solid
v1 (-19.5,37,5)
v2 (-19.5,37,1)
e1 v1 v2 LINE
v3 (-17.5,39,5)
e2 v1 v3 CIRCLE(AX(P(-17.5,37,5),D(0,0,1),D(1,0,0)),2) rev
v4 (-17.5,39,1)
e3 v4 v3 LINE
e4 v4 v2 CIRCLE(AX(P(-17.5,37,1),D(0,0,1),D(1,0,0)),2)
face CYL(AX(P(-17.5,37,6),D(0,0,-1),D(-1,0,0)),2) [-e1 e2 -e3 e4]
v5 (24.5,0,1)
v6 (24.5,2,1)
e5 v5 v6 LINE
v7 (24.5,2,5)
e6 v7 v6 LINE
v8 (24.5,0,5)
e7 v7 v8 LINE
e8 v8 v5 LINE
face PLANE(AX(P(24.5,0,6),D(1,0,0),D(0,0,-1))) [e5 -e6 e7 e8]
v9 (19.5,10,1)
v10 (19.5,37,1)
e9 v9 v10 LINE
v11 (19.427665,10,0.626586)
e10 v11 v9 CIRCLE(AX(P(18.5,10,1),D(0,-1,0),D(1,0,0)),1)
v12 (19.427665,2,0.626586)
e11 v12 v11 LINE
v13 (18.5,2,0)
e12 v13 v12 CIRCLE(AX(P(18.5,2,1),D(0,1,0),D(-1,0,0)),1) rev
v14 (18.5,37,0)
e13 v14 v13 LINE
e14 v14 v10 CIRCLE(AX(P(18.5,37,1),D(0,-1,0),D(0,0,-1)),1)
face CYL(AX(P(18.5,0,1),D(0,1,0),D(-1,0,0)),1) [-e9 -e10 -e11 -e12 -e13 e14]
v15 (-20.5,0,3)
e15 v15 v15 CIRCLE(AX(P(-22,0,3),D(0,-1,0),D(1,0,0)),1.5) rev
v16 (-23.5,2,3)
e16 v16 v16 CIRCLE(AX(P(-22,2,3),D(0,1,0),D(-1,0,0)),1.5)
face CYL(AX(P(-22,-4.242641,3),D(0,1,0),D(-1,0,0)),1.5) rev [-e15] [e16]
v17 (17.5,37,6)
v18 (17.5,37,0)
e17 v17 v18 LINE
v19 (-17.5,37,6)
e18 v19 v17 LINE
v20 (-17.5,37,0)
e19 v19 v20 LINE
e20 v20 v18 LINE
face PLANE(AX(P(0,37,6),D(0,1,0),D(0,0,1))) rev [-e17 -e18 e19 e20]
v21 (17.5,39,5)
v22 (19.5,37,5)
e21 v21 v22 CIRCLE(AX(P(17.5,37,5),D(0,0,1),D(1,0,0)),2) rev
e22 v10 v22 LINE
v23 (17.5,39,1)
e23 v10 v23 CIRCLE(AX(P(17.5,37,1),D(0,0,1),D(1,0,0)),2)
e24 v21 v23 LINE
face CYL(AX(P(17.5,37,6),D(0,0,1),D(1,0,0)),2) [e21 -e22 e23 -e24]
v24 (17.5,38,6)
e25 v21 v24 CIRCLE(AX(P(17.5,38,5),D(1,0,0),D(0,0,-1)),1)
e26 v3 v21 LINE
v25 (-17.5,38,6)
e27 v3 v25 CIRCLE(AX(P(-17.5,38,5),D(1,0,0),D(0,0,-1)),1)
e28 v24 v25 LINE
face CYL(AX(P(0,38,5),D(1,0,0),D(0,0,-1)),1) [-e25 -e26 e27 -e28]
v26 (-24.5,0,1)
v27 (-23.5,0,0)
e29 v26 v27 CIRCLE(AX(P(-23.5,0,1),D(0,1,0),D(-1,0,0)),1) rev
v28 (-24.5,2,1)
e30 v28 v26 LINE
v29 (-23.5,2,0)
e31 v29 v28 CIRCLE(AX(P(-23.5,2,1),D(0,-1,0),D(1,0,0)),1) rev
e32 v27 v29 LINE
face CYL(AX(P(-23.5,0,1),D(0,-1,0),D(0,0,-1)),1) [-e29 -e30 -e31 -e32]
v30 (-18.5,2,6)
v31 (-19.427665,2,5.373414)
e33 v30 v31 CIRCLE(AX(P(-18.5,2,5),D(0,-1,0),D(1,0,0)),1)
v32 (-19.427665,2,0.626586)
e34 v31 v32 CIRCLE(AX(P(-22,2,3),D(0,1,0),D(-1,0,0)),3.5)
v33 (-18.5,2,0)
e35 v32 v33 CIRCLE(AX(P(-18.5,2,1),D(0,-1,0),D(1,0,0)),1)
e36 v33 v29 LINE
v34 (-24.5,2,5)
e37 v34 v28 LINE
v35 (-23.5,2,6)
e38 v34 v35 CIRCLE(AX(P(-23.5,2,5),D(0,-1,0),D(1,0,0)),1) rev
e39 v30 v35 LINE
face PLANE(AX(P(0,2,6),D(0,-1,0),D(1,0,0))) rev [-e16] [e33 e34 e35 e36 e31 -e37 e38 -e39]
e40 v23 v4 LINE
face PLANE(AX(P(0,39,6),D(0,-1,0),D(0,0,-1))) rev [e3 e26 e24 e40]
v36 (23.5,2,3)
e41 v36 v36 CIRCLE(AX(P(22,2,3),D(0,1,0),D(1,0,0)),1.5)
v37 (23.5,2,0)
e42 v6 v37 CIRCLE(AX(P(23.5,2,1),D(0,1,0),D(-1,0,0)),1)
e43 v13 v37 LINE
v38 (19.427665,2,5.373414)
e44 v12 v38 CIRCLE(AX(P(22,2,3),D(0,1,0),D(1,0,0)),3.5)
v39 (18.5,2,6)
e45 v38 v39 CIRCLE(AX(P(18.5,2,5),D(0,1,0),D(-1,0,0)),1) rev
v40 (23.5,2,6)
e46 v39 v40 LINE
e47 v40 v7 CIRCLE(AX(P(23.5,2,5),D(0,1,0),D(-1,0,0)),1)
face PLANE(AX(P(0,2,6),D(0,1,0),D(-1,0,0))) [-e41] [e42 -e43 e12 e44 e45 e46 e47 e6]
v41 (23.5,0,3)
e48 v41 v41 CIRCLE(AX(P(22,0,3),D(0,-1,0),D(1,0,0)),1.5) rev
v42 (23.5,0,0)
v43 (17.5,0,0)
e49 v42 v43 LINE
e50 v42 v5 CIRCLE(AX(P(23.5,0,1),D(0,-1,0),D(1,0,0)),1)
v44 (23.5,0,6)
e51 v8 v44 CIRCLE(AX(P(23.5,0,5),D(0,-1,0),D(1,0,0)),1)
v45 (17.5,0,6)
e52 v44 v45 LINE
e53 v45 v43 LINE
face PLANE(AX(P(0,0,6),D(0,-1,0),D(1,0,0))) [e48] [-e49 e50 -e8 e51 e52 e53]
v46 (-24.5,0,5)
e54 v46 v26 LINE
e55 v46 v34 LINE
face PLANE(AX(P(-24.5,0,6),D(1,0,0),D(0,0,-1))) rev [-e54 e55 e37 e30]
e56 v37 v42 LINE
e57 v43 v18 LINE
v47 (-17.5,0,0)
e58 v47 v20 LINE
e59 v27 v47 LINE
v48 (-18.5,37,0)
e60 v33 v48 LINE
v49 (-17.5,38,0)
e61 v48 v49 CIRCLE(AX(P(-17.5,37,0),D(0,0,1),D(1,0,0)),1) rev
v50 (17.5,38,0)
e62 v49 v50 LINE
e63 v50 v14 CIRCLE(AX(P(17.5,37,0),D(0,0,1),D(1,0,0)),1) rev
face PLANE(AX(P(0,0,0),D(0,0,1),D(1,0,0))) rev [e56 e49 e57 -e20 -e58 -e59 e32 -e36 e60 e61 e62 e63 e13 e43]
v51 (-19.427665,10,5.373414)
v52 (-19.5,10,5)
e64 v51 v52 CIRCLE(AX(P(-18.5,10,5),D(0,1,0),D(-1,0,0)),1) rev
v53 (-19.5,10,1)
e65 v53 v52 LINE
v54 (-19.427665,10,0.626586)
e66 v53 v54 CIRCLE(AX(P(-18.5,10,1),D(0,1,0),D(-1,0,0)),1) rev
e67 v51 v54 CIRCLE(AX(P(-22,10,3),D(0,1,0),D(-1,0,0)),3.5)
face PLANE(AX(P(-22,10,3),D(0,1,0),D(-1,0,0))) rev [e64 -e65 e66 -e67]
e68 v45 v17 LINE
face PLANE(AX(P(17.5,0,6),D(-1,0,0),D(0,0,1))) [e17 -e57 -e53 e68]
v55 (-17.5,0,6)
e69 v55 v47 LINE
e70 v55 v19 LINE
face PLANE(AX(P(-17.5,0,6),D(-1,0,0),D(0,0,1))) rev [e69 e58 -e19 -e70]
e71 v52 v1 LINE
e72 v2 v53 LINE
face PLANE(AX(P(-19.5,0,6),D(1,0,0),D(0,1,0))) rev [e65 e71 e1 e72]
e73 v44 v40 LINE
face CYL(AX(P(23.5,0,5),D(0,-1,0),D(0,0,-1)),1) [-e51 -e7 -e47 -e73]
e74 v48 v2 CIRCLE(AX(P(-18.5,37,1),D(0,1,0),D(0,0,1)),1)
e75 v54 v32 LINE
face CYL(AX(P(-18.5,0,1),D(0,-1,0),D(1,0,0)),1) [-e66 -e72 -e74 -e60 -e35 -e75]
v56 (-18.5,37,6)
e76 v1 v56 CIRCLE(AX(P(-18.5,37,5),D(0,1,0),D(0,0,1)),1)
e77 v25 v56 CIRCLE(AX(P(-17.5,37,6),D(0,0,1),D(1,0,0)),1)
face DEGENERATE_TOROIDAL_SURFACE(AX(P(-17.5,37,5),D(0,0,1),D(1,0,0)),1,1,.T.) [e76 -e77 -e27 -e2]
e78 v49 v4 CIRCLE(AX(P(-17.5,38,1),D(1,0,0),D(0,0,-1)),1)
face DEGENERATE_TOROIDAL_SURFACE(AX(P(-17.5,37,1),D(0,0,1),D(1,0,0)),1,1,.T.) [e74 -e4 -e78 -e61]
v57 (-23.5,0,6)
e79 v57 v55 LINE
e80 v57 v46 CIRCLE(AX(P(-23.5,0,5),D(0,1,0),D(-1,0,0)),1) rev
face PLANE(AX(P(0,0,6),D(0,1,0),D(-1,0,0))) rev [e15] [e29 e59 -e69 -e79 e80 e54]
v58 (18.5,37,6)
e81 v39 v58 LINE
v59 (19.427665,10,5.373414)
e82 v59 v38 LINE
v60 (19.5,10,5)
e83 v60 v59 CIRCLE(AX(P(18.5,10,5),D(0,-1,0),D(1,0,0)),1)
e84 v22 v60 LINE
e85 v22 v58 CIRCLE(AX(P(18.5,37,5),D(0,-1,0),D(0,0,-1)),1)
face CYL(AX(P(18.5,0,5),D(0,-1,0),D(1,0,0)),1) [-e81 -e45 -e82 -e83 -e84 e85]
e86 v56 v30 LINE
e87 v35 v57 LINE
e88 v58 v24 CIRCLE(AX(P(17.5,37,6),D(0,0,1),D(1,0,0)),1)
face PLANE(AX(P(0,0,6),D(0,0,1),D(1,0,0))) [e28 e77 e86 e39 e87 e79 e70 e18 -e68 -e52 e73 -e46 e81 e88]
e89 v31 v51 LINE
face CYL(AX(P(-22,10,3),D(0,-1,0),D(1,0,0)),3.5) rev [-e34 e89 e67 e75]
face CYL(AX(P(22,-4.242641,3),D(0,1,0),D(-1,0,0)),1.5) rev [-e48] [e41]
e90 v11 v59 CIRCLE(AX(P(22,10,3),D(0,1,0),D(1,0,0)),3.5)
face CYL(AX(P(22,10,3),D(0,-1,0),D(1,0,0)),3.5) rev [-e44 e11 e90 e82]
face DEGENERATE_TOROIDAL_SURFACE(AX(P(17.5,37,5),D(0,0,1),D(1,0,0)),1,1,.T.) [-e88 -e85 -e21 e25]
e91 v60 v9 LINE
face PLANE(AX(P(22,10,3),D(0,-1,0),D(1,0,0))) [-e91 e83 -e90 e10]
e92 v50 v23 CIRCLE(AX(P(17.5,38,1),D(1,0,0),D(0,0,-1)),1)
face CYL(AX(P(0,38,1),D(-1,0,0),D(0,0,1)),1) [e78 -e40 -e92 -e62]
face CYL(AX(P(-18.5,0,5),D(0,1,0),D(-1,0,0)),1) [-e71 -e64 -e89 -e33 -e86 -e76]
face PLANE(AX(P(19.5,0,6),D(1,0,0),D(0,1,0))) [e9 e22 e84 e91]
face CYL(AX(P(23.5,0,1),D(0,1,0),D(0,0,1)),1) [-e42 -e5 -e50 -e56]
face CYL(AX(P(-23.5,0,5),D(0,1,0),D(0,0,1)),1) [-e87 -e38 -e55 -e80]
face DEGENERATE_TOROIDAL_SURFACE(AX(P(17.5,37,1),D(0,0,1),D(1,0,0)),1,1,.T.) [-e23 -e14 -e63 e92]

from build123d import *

# Parameters (mm, degrees)
BOSS_EXTRUDE1_DEPTH = 6
SKETCH2_R           = 1.5
CUT_EXTRUDE1_DEPTH  = 2
FILLET1_R           = 2
SKETCH3_R           = 3.5
CUT_EXTRUDE2_DEPTH  = 8
FILLET2_R           = 1


with BuildPart() as part:
    # Sketch1 → Boss-Extrude1 (new body)
    with BuildSketch(Plane.XY):
        Polygon((-24.5, 2), (-24.5, 0), (-17.5, 0), (-17.5, 37), (0, 37), (0, 39), (-19.5, 39), (-19.5, 2), align=None)
        Polygon((0, 39), (0, 37), (17.5, 37), (17.5, 0), (24.5, 0), (24.5, 2), (19.5, 2), (19.5, 39), align=None)
    extrude(amount=BOSS_EXTRUDE1_DEPTH)

    # Sketch2 → Cut-Extrude1 (cut)
    with BuildSketch(Plane(origin=(0, 2, 0), x_dir=(1, 0, 0), z_dir=(0, 1, 0))):
        with Locations(Location((-22, -3, 0), (0, 0, 180))):
            Circle(SKETCH2_R)
        with Locations((22, -3)):
            Circle(SKETCH2_R)
    extrude(amount=-CUT_EXTRUDE1_DEPTH, mode=Mode.SUBTRACT)

    # Fillet1
    fillet1_edges = [part.edges().sort_by_distance(p)[0] for p in [
        (-19.5, 39, 3),
        (19.5, 39, 3),
    ]]
    fillet(fillet1_edges, radius=FILLET1_R)

    # Sketch3 → Cut-Extrude2 (cut)
    with BuildSketch(Plane(origin=(0, 2, 0), x_dir=(1, 0, 0), z_dir=(0, 1, 0))):
        with Locations((-22, -3)):
            Circle(SKETCH3_R)
        with Locations((22, -3)):
            Circle(SKETCH3_R)
    extrude(amount=CUT_EXTRUDE2_DEPTH, mode=Mode.SUBTRACT)

    # Fillet2
    # the kernel refuses this fillet: 1 mm, written as the material it takes off along each edge
    with BuildSketch(Plane(origin=(19.5, 2, 0), x_dir=(0, 0, 1), z_dir=(0, 1, 0)), Plane(origin=(19.5, 2, 6), x_dir=(-1, 0, 0), z_dir=(0, 1, 0)), Plane(origin=(17.5, 39, 0), x_dir=(0, 0, 1), z_dir=(-1, 0, 0)), Plane(origin=(-17.5, 39, 6), x_dir=(0, 0, -1), z_dir=(1, 0, 0)), Plane(origin=(-19.5, 37, 6), x_dir=(1, 0, 0), z_dir=(0, -1, 0)), Plane(origin=(-19.5, 37, 0), x_dir=(0, 0, 1), z_dir=(0, -1, 0))) as fillet2_piece_1:
        with BuildLine():
            CenterArc((FILLET2_R, -FILLET2_R), FILLET2_R, 90, 90)
            Line((0, -FILLET2_R), (0, 0))
            Line((0, 0), (FILLET2_R, 0))
        make_face()
    extrude(amount=35, mode=Mode.SUBTRACT)
    with BuildSketch(Plane(origin=(17.5, 37, 6), x_dir=(0, 1, 0), z_dir=(-1, 0, 0))) as fillet2_piece_2:
        with BuildLine():
            CenterArc((2 - FILLET2_R, FILLET2_R), FILLET2_R, 270, 90)
            Line((2, FILLET2_R), (2, 0))
            Line((2, 0), (2 - FILLET2_R, 0))
        make_face()
    revolve(axis=Axis((17.5, 37, 6), (0, 0, -1)), revolution_arc=90, mode=Mode.SUBTRACT)
    with BuildSketch(Plane(origin=(17.5, 37, 0), x_dir=(0, 1, 0), z_dir=(-1, 0, 0))) as fillet2_piece_3:
        with BuildLine():
            CenterArc((2 - FILLET2_R, -FILLET2_R), FILLET2_R, 0, 90)
            Line((2 - FILLET2_R, 0), (2, 0))
            Line((2, 0), (2, -FILLET2_R))
        make_face()
    revolve(axis=Axis((17.5, 37, 0), (0, 0, -1)), revolution_arc=90, mode=Mode.SUBTRACT)
    with BuildSketch(Plane(origin=(-17.5, 37, 6), x_dir=(0, 1, 0), z_dir=(1, 0, 0))) as fillet2_piece_4:
        with BuildLine():
            CenterArc((2 - FILLET2_R, -FILLET2_R), FILLET2_R, 0, 90)
            Line((2, -FILLET2_R), (2, 0))
            Line((2, 0), (2 - FILLET2_R, 0))
        make_face()
    revolve(axis=Axis((-17.5, 37, 6), (0, 0, 1)), revolution_arc=90, mode=Mode.SUBTRACT)
    with BuildSketch(Plane(origin=(-17.5, 37, 0), x_dir=(0, 1, 0), z_dir=(1, 0, 0))) as fillet2_piece_5:
        with BuildLine():
            CenterArc((2 - FILLET2_R, FILLET2_R), FILLET2_R, 270, 90)
            Line((2 - FILLET2_R, 0), (2, 0))
            Line((2, 0), (2, FILLET2_R))
        make_face()
    revolve(axis=Axis((-17.5, 37, 0), (0, 0, 1)), revolution_arc=90, mode=Mode.SUBTRACT)
    with BuildSketch(Plane(origin=(24.5, -2.5, 0), x_dir=(0, 0, 1), z_dir=(0, 1, 0)), Plane(origin=(24.5, -2.5, 6), x_dir=(-1, 0, 0), z_dir=(0, 1, 0)), Plane(origin=(-24.5, 4.5, 0), x_dir=(0, 0, 1), z_dir=(0, -1, 0)), Plane(origin=(-24.5, 4.5, 6), x_dir=(1, 0, 0), z_dir=(0, -1, 0))) as fillet2_piece_6:
        with BuildLine():
            CenterArc((FILLET2_R, -FILLET2_R), FILLET2_R, 90, 90)
            Line((0, -FILLET2_R), (0, 0))
            Line((0, 0), (FILLET2_R, 0))
        make_face()
    extrude(amount=7, mode=Mode.SUBTRACT)


solid = part.part
